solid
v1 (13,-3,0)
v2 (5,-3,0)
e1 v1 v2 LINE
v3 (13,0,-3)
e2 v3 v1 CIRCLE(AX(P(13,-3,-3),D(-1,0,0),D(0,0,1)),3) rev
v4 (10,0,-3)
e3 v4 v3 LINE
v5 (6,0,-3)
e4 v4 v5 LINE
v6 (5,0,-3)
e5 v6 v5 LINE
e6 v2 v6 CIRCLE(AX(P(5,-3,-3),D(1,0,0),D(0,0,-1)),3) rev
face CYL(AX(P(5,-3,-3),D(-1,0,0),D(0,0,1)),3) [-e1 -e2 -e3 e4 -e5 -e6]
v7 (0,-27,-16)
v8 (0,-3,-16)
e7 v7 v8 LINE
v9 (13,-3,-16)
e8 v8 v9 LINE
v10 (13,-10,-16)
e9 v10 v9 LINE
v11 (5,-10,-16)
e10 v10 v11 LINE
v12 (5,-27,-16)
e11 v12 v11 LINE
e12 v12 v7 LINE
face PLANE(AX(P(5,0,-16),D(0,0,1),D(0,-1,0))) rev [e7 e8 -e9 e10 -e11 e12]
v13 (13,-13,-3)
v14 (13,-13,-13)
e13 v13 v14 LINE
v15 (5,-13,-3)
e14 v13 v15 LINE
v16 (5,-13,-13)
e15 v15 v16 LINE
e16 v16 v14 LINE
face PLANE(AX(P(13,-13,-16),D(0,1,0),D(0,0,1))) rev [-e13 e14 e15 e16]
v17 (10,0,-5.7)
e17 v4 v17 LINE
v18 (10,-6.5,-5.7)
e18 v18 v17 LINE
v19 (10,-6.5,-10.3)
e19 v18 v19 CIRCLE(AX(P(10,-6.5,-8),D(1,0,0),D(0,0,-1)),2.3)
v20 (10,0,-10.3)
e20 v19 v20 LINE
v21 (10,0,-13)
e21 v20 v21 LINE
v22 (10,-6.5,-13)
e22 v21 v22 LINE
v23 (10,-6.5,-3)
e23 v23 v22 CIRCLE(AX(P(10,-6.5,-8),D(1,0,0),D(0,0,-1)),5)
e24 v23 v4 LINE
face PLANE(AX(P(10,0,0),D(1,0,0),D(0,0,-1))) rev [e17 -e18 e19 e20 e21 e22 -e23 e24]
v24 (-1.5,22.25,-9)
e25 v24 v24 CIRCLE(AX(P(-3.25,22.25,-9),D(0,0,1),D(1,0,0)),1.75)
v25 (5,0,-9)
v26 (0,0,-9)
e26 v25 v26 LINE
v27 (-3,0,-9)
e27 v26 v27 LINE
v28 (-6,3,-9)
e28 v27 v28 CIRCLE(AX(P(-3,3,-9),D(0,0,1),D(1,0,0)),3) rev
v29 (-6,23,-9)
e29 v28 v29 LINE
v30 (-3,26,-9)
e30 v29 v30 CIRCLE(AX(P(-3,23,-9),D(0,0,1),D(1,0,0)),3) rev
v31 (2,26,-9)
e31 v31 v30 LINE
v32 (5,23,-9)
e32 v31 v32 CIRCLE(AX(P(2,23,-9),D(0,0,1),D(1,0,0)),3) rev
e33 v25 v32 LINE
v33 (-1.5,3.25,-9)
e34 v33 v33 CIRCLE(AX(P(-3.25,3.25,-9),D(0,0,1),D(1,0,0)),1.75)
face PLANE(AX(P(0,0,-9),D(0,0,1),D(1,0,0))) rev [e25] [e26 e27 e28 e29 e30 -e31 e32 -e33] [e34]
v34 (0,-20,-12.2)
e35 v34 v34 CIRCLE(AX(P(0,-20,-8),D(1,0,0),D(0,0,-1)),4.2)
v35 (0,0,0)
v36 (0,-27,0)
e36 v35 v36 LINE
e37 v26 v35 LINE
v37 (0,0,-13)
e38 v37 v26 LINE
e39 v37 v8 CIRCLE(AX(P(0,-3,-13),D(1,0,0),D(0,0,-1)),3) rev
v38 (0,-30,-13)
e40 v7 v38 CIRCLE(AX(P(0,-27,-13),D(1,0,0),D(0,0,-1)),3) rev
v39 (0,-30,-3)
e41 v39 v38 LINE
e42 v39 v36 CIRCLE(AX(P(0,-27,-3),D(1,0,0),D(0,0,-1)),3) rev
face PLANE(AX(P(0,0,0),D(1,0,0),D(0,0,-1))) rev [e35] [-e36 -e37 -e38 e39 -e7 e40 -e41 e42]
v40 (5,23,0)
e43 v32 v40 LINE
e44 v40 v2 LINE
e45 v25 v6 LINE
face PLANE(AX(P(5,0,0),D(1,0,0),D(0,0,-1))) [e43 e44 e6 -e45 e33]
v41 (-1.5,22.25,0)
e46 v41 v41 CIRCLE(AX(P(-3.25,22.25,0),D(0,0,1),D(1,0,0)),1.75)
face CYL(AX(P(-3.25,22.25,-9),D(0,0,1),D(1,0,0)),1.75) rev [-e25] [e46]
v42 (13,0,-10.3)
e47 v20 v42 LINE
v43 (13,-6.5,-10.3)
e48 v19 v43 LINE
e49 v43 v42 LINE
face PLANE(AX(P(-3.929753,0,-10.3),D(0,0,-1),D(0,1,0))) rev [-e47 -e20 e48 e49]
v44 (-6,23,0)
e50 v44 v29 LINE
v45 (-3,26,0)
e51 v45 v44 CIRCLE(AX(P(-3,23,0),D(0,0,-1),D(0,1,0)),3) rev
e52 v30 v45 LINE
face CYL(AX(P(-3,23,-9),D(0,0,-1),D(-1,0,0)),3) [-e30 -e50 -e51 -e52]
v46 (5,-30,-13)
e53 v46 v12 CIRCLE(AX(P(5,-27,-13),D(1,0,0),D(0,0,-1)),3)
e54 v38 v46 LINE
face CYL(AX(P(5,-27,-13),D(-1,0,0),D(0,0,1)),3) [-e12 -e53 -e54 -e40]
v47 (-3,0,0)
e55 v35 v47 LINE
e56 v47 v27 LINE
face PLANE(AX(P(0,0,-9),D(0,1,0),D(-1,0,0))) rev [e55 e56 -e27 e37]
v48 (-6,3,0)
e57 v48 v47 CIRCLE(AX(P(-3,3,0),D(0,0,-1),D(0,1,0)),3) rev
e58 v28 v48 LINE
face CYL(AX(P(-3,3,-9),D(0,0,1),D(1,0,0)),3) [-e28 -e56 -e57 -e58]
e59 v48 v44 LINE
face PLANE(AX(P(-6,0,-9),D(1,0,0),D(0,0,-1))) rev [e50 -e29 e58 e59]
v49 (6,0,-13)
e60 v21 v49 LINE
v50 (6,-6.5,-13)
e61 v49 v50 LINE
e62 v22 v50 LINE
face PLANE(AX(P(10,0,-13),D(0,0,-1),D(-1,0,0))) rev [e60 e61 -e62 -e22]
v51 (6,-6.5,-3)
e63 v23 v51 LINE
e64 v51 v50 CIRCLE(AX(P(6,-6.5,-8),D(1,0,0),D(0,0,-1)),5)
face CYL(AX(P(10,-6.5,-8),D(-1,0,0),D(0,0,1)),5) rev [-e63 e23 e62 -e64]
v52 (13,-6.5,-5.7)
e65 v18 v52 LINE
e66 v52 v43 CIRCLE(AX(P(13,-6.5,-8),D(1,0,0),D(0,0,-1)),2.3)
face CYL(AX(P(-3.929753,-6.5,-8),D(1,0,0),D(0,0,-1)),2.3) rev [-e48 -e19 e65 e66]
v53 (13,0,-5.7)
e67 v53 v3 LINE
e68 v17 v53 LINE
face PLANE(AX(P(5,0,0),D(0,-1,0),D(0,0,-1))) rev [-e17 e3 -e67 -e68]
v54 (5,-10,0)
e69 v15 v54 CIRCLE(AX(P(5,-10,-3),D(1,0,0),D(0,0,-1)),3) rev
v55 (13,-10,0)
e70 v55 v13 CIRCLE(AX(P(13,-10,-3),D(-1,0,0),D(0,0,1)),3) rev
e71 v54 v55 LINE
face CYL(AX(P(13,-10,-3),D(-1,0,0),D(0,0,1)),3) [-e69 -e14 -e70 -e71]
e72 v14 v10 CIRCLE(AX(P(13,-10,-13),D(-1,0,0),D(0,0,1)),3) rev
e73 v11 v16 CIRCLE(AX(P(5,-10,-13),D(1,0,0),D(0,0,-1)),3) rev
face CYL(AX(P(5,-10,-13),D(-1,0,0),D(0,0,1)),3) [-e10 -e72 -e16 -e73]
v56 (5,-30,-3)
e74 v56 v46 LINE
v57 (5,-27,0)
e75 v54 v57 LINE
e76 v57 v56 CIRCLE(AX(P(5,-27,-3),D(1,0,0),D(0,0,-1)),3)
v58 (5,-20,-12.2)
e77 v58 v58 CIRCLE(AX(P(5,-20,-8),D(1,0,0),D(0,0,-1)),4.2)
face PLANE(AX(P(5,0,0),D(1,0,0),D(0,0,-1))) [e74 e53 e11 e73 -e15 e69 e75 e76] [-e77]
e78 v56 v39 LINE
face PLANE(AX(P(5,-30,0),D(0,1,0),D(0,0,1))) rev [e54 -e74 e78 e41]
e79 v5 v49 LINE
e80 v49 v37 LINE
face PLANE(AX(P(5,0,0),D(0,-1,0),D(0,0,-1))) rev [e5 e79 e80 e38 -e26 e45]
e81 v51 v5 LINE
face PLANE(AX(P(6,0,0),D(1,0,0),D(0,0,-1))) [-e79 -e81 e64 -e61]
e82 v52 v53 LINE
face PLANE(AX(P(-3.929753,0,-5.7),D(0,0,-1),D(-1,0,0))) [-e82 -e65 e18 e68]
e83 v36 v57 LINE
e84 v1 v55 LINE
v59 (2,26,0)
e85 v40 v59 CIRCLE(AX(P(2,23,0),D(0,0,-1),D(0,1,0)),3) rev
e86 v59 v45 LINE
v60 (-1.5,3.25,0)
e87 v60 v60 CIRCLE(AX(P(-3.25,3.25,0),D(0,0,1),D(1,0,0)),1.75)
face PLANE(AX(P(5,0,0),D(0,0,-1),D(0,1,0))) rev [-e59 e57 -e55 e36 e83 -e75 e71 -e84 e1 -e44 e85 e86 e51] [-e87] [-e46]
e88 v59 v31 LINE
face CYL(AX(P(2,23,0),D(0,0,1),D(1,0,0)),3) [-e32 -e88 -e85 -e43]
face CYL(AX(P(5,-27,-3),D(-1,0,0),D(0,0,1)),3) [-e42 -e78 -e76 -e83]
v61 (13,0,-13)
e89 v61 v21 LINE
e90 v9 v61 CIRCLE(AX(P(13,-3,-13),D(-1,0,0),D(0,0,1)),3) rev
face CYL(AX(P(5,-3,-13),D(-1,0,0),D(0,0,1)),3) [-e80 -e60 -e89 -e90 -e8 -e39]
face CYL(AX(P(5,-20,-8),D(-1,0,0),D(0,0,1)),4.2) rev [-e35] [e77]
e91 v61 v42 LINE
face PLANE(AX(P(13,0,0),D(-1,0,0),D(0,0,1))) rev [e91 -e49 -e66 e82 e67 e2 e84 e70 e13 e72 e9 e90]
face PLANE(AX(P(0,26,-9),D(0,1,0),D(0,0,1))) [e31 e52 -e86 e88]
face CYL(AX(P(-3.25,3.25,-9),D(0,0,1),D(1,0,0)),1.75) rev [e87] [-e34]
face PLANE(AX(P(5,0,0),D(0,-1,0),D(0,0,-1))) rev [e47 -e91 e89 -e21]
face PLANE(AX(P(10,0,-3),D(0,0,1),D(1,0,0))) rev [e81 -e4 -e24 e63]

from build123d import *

# Parameters (mm, degrees)
SKETCH1_W           = 16
SKETCH1_H           = 30
SKETCH1_R           = 4.2
BOSS_EXTRUDE1_DEPTH = 5
SKETCH2_W           = 11
SKETCH2_H           = 26
SKETCH2_R           = 1.75
BOSS_EXTRUDE2_DEPTH = 9
SKETCH3_W           = 16
SKETCH3_H           = 13
BOSS_EXTRUDE3_DEPTH = 8
CUT_EXTRUDE1_START  = 1
CUT_EXTRUDE1_DEPTH  = 4
CUT_EXTRUDE2_DEPTH  = 7
FILLET1_START       = -10
FILLET1_DEPTH       = 10
FILLET1_START_2     = 5
FILLET1_2_DEPTH     = 9
FILLET1_START_3     = -6
FILLET1_3_DEPTH     = 11


with BuildPart() as part:
    # Sketch1 → Boss-Extrude1 (new body)
    with BuildSketch(Plane(origin=(0, 0, 0), x_dir=(0, 0, -1), z_dir=(1, 0, 0))):
        with Locations((8, -15)):
            Rectangle(SKETCH1_W, SKETCH1_H)
        with Locations((8, -20)):
            Circle(SKETCH1_R, mode=Mode.SUBTRACT)
    extrude(amount=BOSS_EXTRUDE1_DEPTH)

    # Sketch2 → Boss-Extrude2 (add)
    with BuildSketch(Plane.XY):
        with Locations((-0.5, 13)):
            Rectangle(SKETCH2_W, SKETCH2_H)
        with Locations((-3.25, 22.25)):
            Circle(SKETCH2_R, mode=Mode.SUBTRACT)
        with Locations((-3.25, 3.25)):
            Circle(SKETCH2_R, mode=Mode.SUBTRACT)
    extrude(amount=-BOSS_EXTRUDE2_DEPTH)

    # Sketch3 → Boss-Extrude3 (add)
    with BuildSketch(Plane(origin=(5, 0, 0), x_dir=(0, 0, -1), z_dir=(1, 0, 0))):
        with Locations((8, -6.5)):
            Rectangle(SKETCH3_W, SKETCH3_H)
    extrude(amount=BOSS_EXTRUDE3_DEPTH)

    # Sketch5 → Cut-Extrude1 (cut)
    with BuildSketch(Plane(origin=(5, 0, 0), x_dir=(0, 0, -1), z_dir=(1, 0, 0)).offset(CUT_EXTRUDE1_START)):
        with BuildLine():
            ThreePointArc((3, -6.5), (3.288161187, -8.172894198), (4.119429999, -9.652963125))
            Line((4.119429999, -9.652963125), (11.880570001, -3.347036875))
            ThreePointArc((11.880570001, -3.347036875), (6.327105802, -1.788161187), (3, -6.5))
        make_face()
        with BuildLine():
            Line((11.880570001, -3.347036875), (4.119429999, -9.652963125))
            ThreePointArc((4.119429999, -9.652963125), (9.672894198, -11.211838813), (13, -6.5))
            ThreePointArc((13, -6.5), (12.711838813, -4.827105802), (11.880570001, -3.347036875))
        make_face()
        with BuildLine():
            ThreePointArc((3, -6.5), (6.327105802, -1.788161187), (11.880570001, -3.347036875))
            Line((11.880570001, -3.347036875), (13, -2.4375))
            Line((13, -2.4375), (13, 0))
            Line((13, 0), (9, 0))
            Line((9, 0), (3, 0))
            Line((3, 0), (3, -6.5))
        make_face()
        with BuildLine():
            Line((13, -2.4375), (11.880570001, -3.347036875))
            ThreePointArc((11.880570001, -3.347036875), (12.711838813, -4.827105802), (13, -6.5))
            Line((13, -6.5), (13, -2.4375))
        make_face()
    extrude(amount=CUT_EXTRUDE1_DEPTH, mode=Mode.SUBTRACT)

    # Sketch6 → Cut-Extrude2 (cut)
    with BuildSketch(Plane(origin=(13, 0, 0), x_dir=(0, 0, -1), z_dir=(1, 0, 0))):
        with BuildLine():
            Line((10.3, 0), (5.7, 0))
            Line((5.7, 0), (5.7, -6.5))
            ThreePointArc((5.7, -6.5), (8, -8.8), (10.3, -6.5))
            Line((10.3, -6.5), (10.3, 0))
        make_face()
    extrude(amount=-CUT_EXTRUDE2_DEPTH, mode=Mode.SUBTRACT)

    # Fillet1: read off the stored shape, not the designer's step
    # Fillet1 outline → Fillet1 (cut)
    with BuildSketch(Plane.XY.offset(FILLET1_START)):
        with BuildLine():
            Line((-6, 26), (-6, 23))
            ThreePointArc((-6, 23), (-5.121320344, 25.121320344), (-3, 26))
            Line((-3, 26), (-6, 26))
        make_face()
        with BuildLine():
            ThreePointArc((-3, 0), (-5.121320344, 0.878679656), (-6, 3))
            Line((-6, 3), (-6, 0))
            Line((-6, 0), (-3, 0))
        make_face()
        with BuildLine():
            Line((5, 26), (2, 26))
            ThreePointArc((2, 26), (4.121320344, 25.121320344), (5, 23))
            Line((5, 23), (5, 26))
        make_face()
    extrude(amount=FILLET1_DEPTH, mode=Mode.SUBTRACT)

    # Fillet1 2 outline → Fillet1 2 (cut)
    with BuildSketch(Plane.YZ.offset(FILLET1_START_2)):
        with BuildLine():
            Line((0, 0), (-3, 0))
            ThreePointArc((-3, 0), (-0.878679656, -0.878679656), (0, -3))
            Line((0, -3), (0, 0))
        make_face()
        with BuildLine():
            ThreePointArc((-13, -3), (-12.121320344, -0.878679656), (-10, 0))
            Line((-10, 0), (-13, 0))
            Line((-13, 0), (-13, -3))
        make_face()
        with BuildLine():
            Line((0, -16), (0, -13))
            ThreePointArc((0, -13), (-0.878679656, -15.121320344), (-3, -16))
            Line((-3, -16), (0, -16))
        make_face()
        with BuildLine():
            ThreePointArc((-10, -16), (-12.121320344, -15.121320344), (-13, -13))
            Line((-13, -13), (-13, -16))
            Line((-13, -16), (-10, -16))
        make_face()
    extrude(amount=FILLET1_2_DEPTH, mode=Mode.SUBTRACT)

    # Fillet1 3 outline → Fillet1 3 (cut)
    with BuildSketch(Plane.YZ.offset(FILLET1_START_3)):
        with BuildLine():
            Line((0, -16), (0, -13))
            ThreePointArc((0, -13), (-0.878679656, -15.121320344), (-3, -16))
            Line((-3, -16), (0, -16))
        make_face()
        with BuildLine():
            ThreePointArc((-30, -3), (-29.121320344, -0.878679656), (-27, 0))
            Line((-27, 0), (-30, 0))
            Line((-30, 0), (-30, -3))
        make_face()
        with BuildLine():
            Line((-30, -16), (-27, -16))
            ThreePointArc((-27, -16), (-29.121320344, -15.121320344), (-30, -13))
            Line((-30, -13), (-30, -16))
        make_face()
    extrude(amount=FILLET1_3_DEPTH, mode=Mode.SUBTRACT)


solid = part.part
